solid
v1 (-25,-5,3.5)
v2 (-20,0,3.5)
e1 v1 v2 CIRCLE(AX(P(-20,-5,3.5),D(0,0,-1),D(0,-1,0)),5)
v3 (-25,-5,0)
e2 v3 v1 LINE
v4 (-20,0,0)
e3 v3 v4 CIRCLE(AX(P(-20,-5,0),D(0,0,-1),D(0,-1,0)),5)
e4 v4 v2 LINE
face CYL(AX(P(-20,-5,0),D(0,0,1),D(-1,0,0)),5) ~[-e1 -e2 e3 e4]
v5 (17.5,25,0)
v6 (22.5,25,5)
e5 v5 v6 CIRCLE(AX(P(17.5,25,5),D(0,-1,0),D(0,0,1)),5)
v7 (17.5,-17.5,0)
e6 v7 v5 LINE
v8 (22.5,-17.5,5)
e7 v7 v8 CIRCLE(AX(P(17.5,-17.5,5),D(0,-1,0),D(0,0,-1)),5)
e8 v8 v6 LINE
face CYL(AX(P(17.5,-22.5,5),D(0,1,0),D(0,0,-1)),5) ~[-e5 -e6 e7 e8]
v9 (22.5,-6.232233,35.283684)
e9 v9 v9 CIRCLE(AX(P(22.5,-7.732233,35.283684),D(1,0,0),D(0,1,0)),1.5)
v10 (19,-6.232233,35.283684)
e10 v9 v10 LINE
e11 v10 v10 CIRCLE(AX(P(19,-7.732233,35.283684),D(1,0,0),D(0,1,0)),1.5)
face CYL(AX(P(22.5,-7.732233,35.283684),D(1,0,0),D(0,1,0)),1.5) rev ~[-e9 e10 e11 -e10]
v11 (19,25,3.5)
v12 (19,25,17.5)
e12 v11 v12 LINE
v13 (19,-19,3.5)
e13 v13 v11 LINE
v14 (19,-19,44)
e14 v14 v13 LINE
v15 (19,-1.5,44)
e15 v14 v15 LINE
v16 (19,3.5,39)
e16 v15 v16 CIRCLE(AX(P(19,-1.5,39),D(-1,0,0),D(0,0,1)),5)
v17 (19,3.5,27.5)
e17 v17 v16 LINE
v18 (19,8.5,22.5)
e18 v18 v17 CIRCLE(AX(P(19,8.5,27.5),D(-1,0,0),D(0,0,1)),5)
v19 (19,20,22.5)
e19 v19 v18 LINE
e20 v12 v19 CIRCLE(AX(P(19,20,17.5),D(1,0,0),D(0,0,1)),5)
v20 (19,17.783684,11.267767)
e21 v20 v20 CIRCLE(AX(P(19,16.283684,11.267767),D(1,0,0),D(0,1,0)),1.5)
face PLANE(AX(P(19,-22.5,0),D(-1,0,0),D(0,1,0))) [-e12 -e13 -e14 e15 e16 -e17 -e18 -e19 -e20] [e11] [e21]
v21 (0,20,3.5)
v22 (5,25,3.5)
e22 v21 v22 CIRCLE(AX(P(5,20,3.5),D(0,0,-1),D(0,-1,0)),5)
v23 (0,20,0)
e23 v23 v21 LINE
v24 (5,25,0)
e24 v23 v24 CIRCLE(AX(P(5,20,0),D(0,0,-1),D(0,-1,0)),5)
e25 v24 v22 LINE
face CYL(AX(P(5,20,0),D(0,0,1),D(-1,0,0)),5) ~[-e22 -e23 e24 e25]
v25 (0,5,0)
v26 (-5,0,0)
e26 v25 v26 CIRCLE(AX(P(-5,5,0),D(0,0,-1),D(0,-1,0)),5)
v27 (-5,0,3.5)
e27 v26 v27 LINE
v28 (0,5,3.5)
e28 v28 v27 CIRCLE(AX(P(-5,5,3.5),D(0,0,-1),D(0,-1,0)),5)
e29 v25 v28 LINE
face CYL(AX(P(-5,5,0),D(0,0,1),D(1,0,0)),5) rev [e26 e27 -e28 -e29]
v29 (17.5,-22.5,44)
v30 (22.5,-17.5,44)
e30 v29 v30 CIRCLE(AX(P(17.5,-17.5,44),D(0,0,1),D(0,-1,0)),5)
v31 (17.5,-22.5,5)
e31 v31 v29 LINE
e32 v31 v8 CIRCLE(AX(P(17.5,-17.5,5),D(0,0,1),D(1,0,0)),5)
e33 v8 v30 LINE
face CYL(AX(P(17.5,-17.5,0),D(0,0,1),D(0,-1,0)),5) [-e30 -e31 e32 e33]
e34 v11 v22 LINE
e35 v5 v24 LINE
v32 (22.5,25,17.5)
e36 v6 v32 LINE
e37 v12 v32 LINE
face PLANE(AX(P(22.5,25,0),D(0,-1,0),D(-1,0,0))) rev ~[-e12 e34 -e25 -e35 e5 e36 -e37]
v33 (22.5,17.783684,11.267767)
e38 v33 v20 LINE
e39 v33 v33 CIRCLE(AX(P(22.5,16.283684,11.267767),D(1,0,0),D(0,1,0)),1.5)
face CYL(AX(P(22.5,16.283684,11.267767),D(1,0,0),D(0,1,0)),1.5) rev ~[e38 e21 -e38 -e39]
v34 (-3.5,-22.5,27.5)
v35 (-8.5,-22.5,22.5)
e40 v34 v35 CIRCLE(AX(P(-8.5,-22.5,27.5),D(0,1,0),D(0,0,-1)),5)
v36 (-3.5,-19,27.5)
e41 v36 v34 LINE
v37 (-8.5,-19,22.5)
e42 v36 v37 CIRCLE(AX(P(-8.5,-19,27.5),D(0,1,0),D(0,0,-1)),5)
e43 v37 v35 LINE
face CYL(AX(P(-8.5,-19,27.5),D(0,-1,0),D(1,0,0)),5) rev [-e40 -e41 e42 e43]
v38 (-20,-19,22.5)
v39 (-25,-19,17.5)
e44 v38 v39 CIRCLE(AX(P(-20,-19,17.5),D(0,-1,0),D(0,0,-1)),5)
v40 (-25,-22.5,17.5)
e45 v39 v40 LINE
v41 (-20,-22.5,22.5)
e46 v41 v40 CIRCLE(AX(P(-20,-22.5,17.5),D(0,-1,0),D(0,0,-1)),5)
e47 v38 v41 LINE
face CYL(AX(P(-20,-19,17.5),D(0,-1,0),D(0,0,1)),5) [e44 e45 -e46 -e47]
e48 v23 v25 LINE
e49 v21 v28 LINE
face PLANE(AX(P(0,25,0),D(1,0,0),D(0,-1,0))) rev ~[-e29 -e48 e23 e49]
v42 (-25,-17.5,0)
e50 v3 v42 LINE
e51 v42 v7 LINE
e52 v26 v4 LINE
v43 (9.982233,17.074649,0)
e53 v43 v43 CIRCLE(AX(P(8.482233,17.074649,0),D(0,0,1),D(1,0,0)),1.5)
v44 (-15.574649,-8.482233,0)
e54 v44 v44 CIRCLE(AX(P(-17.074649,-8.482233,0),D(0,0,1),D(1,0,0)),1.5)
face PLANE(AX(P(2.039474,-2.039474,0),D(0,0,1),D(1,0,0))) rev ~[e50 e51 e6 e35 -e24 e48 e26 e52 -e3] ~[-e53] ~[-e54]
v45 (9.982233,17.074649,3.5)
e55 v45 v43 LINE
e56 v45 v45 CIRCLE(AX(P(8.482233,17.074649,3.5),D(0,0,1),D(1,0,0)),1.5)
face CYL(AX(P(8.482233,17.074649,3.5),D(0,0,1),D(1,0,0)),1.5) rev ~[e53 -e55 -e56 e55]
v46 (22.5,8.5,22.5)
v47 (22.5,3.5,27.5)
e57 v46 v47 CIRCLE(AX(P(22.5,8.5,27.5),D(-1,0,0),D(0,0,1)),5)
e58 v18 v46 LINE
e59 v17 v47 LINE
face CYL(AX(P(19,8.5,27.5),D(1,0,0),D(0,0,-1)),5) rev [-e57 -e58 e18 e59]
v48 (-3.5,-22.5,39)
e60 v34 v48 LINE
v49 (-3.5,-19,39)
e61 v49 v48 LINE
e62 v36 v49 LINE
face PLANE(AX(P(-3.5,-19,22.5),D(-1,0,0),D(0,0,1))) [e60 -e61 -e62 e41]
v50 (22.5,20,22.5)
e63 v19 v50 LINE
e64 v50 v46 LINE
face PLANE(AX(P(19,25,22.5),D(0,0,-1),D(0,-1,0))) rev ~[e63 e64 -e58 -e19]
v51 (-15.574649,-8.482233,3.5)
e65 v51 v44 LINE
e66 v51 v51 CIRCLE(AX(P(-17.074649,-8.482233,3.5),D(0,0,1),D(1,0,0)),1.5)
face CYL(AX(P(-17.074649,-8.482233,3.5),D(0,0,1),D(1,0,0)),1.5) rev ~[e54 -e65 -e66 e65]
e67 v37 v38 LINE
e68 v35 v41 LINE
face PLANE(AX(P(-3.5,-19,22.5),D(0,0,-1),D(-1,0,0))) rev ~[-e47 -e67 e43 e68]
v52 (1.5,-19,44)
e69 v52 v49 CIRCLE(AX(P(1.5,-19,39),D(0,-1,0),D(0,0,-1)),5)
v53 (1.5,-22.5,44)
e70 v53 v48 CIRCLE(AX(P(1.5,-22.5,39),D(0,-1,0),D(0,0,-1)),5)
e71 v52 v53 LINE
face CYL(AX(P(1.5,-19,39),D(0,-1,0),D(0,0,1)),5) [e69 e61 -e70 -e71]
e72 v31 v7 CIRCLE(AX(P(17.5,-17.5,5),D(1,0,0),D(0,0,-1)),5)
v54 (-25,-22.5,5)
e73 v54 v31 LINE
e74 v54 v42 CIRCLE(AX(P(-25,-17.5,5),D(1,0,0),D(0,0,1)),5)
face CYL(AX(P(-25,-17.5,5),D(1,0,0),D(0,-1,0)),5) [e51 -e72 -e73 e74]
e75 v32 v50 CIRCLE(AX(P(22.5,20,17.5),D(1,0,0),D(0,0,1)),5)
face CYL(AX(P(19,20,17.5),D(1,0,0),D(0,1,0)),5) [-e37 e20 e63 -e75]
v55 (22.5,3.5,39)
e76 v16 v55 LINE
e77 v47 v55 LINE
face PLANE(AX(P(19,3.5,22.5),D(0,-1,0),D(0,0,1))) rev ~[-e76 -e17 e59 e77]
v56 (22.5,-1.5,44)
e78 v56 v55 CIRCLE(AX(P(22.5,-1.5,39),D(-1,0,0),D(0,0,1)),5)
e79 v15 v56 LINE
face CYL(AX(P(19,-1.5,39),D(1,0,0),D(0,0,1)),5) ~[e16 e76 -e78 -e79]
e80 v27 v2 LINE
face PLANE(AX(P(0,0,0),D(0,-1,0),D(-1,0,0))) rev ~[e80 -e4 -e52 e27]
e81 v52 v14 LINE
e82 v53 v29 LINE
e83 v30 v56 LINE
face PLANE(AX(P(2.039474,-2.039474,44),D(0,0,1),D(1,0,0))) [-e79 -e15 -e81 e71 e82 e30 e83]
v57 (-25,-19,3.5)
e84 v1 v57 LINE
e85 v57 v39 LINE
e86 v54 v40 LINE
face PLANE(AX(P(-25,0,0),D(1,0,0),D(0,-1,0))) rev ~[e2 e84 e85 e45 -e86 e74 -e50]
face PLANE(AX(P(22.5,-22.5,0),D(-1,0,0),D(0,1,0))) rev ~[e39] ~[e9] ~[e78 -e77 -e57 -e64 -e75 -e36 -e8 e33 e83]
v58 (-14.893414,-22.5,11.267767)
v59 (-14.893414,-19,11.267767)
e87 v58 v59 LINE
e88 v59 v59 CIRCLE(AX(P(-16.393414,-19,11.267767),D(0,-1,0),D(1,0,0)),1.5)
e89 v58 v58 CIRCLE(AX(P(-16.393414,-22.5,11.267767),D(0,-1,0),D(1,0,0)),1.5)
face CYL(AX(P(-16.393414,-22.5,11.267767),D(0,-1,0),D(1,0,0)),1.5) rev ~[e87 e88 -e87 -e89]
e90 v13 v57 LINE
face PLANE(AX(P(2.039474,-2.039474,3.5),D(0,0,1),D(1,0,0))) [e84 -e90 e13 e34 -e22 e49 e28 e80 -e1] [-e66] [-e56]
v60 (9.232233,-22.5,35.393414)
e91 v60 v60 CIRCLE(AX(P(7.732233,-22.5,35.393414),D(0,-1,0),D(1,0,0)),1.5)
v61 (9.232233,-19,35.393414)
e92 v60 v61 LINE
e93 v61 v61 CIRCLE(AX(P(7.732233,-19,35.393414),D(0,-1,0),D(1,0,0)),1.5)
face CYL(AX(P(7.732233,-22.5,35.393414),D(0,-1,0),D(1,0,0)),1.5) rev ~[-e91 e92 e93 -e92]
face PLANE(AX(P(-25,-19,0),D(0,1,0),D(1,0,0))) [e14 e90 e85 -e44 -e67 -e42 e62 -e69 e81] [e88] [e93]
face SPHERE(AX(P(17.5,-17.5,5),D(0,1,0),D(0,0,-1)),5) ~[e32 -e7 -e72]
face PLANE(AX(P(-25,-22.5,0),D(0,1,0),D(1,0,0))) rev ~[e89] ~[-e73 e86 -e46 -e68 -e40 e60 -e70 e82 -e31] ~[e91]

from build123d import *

# Parameters (mm, degrees)
F1_DEPTH  = 44
F2_T      = -3.5
F3_W      = 21.5
F3_H      = 21.5
F4_DEPTH  = 25
F5_W      = 21.5
F5_H      = 21.5
F6_DEPTH  = 25
F7_R      = 5
F10_R     = 1.5
F11_DEPTH = 25
F9_R      = 1.5
F12_DEPTH = 25
F8_R      = 1.5
F13_DEPTH = 25


with BuildPart() as f1:
    # F0 (on Top) → F1 (new body)
    with BuildSketch(Plane.XY):
        Polygon((0, 25), (0, 0), (-25, 0), (-25, -22.5), (0, -22.5), (22.5, -22.5), (22.5, 0), (22.5, 25), align=None)
    extrude(amount=F1_DEPTH)

    # F2
    f2_openings = [f1.faces().sort_by_distance(p)[0] for p in [
        (3.060345, -3.060345, 44),
        (0, 12.5, 22),
        (-12.5, 0, 22),
        (-25, -11.25, 22),
        (11.25, 25, 22),
    ]]
    offset(amount=F2_T, openings=f2_openings)

    # F3 (on face) → F4 (cut)
    with BuildSketch(Plane(origin=(19, 0, 0), x_dir=(0, -1, 0), z_dir=(-1, 0, 0))):
        with Locations((-14.25, 33.25)):
            Rectangle(F3_W, F3_H)
    extrude(amount=-F4_DEPTH, mode=Mode.SUBTRACT)

    # F5 (on face) → F6 (cut)
    with BuildSketch(Plane(origin=(0, -19, 0), x_dir=(-1, 0, 0), z_dir=(0, 1, 0))):
        with Locations((14.25, 33.25)):
            Rectangle(F5_W, F5_H)
    extrude(amount=-F6_DEPTH, mode=Mode.SUBTRACT)

    # F7
    f7_edges = [f1.edges().sort_by_distance(p)[0] for p in [
        (22.5, 1.25, 0),
        (-1.25, -22.5, 0),
        (22.5, -22.5, 22),
        (0, 0, 1.75),
        (-3.5, -20.75, 22.5),
        (0, 25, 1.75),
        (20.75, 25, 22.5),
        (-3.5, -20.75, 44),
        (-25, -20.75, 22.5),
        (-25, 0, 1.75),
        (20.75, 3.5, 22.5),
        (20.75, 3.5, 44),
    ]]
    fillet(f7_edges, radius=F7_R)

    # F10 (on face) → F11 (cut)
    with BuildSketch(Plane.XZ.offset(22.5)):
        with Locations((7.732233047, 35.3934139763)):
            Circle(F10_R)
        with Locations((-16.3934139763, 11.267766953)):
            Circle(F10_R)
    extrude(amount=-F11_DEPTH, mode=Mode.SUBTRACT)

    # F9 (on face) → F12 (cut)
    with BuildSketch(Plane.YZ.offset(22.5)):
        with Locations((-7.732233047, 35.2836836879)):
            Circle(F9_R)
        with Locations((16.2836836879, 11.267766953)):
            Circle(F9_R)
    extrude(amount=-F12_DEPTH, mode=Mode.SUBTRACT)

    # F8 (on face) → F13 (cut)
    with BuildSketch(Plane.XY.offset(3.5)):
        with Locations((-17.0746488054, -8.482233047)):
            Circle(F8_R)
        with Locations((8.482233047, 17.0746488054)):
            Circle(F8_R)
    extrude(amount=-F13_DEPTH, mode=Mode.SUBTRACT)


solid = f1.part
